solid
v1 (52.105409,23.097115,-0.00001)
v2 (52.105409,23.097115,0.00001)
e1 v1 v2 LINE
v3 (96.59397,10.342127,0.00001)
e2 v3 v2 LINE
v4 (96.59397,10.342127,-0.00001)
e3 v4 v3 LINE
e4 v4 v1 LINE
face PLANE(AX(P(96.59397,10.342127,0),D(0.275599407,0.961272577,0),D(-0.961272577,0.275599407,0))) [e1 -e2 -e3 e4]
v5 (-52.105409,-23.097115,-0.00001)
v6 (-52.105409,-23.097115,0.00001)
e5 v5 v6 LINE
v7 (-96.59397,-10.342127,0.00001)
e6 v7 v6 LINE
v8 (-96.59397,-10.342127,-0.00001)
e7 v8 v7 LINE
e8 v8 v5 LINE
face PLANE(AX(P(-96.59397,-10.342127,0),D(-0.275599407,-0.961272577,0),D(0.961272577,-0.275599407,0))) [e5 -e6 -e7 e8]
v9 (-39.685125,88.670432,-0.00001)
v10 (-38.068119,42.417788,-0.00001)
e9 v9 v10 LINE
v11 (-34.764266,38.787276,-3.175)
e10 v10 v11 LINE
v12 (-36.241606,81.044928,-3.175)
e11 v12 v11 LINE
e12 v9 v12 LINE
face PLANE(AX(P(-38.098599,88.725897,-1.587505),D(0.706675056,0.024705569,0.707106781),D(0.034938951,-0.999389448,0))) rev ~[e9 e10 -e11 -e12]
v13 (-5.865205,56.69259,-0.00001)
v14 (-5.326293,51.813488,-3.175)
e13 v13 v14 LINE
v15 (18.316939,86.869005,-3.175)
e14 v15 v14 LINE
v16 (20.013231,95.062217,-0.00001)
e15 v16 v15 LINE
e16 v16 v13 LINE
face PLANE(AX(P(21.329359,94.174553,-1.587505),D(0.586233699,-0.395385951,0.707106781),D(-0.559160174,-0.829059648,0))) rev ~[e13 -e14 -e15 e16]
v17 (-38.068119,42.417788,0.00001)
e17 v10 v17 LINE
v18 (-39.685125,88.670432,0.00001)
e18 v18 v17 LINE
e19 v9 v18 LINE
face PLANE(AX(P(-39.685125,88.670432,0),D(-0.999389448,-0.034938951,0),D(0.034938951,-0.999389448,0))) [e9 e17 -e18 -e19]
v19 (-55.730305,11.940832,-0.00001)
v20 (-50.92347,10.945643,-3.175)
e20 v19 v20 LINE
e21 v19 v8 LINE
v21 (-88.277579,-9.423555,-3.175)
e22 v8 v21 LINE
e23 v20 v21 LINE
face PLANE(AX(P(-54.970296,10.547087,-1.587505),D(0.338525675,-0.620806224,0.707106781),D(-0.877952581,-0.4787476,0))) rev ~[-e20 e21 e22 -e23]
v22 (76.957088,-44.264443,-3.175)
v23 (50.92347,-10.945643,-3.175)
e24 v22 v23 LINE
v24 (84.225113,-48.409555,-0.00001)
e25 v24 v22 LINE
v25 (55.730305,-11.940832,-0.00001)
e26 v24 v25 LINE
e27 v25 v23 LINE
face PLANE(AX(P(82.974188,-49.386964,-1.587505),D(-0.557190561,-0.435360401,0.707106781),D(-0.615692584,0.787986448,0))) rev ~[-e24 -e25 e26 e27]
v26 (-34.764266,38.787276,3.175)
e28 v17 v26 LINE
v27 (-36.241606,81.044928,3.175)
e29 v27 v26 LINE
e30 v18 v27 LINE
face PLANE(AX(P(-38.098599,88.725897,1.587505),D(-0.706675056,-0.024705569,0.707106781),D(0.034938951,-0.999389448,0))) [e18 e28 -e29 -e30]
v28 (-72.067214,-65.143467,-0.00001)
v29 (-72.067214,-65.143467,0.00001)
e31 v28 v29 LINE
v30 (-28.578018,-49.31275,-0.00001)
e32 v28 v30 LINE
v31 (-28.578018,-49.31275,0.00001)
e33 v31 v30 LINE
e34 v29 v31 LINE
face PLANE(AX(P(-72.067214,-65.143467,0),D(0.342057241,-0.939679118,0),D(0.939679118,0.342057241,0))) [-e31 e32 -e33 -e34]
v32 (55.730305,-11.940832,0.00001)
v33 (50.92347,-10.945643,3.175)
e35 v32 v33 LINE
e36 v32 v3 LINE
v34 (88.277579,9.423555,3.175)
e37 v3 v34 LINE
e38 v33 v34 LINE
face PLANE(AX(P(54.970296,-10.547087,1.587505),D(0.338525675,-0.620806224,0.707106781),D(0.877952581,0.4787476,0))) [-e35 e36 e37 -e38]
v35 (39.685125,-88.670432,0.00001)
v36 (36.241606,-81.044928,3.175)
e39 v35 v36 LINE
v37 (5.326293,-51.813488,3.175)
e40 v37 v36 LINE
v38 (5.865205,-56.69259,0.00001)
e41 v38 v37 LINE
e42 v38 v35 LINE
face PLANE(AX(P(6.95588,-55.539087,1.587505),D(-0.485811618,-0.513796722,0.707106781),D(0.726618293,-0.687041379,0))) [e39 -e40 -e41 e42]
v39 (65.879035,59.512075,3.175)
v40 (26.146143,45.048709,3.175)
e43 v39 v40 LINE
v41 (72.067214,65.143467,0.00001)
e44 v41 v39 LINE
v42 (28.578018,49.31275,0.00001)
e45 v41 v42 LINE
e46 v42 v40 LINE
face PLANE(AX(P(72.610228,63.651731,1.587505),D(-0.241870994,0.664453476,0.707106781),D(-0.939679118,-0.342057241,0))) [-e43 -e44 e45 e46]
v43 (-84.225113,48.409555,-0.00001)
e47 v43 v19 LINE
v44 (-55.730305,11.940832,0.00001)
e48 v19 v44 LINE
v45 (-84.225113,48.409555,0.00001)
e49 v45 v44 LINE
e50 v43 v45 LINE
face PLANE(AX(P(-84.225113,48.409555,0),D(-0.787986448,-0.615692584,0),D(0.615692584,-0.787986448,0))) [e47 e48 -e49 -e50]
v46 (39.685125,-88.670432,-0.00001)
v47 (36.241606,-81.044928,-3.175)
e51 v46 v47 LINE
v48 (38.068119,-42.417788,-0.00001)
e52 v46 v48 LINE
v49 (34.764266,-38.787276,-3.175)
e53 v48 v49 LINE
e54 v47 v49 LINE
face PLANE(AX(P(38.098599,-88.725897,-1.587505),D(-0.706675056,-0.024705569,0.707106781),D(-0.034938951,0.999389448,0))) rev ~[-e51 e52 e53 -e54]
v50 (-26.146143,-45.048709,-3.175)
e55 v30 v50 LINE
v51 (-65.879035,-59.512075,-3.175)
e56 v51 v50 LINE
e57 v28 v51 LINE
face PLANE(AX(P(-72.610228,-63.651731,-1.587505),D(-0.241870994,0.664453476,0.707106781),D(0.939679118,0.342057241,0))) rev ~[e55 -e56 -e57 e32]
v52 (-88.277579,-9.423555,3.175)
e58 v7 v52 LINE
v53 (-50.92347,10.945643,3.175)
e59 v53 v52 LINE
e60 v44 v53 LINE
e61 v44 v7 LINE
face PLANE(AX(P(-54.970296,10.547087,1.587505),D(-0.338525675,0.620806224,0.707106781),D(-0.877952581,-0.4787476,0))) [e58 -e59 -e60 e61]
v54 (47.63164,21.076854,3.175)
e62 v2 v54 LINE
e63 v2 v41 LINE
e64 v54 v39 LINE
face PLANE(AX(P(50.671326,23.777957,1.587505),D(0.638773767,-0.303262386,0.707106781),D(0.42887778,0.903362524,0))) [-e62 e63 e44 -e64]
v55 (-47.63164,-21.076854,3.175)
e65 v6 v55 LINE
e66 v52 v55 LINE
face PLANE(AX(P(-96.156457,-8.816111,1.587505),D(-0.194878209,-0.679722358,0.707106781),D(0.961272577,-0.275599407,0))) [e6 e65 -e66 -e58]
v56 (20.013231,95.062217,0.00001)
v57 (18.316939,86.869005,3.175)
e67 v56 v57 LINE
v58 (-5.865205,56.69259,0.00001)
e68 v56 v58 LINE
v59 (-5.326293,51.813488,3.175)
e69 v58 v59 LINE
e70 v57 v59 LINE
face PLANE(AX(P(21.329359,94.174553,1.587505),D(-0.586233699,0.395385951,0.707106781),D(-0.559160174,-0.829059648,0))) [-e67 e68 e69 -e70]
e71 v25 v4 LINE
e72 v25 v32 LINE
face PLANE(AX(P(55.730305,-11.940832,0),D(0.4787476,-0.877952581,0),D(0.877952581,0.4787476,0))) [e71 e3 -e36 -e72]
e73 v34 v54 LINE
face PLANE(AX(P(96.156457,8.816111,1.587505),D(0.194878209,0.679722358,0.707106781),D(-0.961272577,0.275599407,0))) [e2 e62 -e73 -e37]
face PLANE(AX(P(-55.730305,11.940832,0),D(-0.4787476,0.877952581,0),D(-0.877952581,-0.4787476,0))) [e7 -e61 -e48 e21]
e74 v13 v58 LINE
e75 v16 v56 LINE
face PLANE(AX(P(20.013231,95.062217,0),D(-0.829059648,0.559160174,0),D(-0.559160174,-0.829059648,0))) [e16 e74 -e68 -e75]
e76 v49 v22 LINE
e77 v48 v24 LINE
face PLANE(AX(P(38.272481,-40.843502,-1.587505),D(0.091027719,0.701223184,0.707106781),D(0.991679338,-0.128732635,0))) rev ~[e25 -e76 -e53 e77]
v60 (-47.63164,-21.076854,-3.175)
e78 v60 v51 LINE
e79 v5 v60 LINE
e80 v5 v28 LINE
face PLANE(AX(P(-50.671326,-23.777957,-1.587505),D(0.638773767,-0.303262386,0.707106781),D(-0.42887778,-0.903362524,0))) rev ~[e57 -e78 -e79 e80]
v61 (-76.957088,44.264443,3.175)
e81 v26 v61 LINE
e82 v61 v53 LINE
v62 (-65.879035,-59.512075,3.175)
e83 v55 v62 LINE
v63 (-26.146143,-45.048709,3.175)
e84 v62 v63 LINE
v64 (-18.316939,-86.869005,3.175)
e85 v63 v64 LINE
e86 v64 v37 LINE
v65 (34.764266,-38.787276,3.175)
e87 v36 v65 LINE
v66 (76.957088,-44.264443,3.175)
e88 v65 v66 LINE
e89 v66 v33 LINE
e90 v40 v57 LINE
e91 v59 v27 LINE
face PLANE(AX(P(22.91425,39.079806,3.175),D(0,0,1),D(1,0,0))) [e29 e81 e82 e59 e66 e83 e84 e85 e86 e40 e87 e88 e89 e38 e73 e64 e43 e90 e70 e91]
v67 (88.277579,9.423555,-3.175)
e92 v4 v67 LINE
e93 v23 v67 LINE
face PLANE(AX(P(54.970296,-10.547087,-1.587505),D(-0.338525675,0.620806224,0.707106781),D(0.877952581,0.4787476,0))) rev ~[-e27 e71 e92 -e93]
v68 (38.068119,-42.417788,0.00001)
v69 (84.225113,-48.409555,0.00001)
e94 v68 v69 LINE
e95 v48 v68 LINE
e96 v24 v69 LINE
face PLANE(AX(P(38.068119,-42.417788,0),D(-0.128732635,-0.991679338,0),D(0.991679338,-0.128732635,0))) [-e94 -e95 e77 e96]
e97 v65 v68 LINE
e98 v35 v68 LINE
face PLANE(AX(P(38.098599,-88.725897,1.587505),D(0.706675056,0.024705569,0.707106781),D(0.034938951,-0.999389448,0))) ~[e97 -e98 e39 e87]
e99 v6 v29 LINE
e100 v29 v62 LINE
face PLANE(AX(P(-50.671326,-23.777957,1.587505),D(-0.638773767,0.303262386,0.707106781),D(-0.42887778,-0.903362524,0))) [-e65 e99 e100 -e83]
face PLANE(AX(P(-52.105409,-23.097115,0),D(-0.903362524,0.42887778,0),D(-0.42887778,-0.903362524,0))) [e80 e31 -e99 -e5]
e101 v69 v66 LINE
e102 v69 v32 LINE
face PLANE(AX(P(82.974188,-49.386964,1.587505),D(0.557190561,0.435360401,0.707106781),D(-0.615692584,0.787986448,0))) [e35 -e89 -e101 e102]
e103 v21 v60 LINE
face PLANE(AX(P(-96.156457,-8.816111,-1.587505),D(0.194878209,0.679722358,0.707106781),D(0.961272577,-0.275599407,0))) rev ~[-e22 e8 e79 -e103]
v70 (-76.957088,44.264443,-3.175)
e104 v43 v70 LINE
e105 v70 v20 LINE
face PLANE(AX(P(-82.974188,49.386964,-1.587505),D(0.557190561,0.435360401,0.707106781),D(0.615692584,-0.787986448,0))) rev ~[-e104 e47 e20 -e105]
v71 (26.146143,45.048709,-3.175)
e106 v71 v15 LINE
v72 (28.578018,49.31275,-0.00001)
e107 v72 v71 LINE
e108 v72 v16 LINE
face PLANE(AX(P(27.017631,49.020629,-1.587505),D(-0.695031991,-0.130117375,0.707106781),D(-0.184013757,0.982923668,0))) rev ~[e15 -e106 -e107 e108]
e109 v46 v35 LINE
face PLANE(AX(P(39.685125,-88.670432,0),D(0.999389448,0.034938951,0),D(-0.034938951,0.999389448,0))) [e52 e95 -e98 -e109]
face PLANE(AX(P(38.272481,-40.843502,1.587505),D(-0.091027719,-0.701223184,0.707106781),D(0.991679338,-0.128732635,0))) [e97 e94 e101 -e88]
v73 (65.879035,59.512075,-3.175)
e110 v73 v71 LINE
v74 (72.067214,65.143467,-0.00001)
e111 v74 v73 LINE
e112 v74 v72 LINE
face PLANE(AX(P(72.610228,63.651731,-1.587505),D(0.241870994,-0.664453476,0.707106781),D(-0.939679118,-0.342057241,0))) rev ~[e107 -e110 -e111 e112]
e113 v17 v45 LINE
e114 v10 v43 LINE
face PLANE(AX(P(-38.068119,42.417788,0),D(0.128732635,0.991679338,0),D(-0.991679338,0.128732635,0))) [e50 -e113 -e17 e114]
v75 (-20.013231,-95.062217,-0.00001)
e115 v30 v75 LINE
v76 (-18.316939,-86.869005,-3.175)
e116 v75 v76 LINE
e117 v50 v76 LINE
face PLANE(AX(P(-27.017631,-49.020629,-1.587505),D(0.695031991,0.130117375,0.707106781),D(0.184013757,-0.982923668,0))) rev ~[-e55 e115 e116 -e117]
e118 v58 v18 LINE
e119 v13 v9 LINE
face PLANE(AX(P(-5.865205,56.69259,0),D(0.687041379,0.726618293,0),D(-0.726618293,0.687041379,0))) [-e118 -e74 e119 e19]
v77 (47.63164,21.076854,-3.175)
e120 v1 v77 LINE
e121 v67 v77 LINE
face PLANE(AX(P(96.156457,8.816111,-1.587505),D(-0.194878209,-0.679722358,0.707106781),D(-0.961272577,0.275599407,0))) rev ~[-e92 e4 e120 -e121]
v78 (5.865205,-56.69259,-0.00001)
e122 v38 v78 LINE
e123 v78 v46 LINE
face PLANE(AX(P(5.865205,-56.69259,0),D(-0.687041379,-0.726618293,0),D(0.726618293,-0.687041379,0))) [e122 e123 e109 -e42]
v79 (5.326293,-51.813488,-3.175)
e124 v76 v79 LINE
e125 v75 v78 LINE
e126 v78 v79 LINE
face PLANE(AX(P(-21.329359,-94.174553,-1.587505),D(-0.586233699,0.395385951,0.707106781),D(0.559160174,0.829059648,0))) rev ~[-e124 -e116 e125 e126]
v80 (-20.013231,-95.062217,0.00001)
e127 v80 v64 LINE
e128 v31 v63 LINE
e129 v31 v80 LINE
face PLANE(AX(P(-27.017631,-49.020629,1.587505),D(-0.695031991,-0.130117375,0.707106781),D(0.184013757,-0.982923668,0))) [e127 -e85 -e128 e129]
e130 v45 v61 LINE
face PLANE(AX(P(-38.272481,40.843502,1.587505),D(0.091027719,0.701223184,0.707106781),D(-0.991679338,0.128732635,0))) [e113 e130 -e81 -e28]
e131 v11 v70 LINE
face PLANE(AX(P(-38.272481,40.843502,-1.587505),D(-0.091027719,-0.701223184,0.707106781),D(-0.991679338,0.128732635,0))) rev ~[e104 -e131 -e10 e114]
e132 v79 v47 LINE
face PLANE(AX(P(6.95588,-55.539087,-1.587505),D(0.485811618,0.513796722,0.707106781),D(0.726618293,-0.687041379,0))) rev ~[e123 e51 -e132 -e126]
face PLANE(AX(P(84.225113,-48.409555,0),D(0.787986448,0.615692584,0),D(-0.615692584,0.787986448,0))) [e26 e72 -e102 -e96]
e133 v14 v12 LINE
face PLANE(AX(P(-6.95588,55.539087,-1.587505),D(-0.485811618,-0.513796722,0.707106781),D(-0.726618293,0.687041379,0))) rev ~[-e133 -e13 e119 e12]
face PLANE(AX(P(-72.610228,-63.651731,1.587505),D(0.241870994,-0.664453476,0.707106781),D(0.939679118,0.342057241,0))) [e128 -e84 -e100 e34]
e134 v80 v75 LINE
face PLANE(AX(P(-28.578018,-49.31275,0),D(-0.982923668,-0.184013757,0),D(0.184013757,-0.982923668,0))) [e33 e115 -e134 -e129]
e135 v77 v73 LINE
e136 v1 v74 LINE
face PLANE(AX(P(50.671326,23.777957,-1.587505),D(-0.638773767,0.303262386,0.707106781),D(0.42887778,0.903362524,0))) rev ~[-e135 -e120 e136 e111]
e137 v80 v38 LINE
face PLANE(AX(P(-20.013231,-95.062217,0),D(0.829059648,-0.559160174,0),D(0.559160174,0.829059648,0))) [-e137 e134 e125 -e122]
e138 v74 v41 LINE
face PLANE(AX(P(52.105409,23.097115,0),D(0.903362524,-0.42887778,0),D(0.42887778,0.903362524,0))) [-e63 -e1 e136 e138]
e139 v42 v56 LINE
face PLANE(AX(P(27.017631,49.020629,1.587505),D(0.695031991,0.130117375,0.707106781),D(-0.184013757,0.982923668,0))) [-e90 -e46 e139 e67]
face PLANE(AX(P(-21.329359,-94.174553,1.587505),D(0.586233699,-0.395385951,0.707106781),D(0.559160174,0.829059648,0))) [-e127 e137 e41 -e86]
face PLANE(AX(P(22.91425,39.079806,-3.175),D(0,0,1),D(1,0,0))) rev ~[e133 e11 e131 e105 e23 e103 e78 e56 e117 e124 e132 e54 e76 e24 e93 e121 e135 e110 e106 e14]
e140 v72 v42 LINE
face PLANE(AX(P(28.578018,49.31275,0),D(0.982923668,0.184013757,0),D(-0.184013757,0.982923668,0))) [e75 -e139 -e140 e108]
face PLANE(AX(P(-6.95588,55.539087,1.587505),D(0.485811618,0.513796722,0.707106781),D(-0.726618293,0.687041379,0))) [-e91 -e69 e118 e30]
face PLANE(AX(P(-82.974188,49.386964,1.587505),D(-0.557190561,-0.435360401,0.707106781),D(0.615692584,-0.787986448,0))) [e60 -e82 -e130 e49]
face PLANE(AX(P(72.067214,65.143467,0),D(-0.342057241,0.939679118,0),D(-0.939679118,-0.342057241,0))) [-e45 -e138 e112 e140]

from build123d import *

# Parameters (mm, degrees)
F1_DEPTH = 3.175
F2_SIZE  = 3.17499


# Not quite as in the source:
# - a fillet or chamfer is up to 0.001 mm smaller than in the source, because OpenCascade refuses the exact size


with BuildPart() as f1:
    # F0 (on Top) → F1 (new body, symmetric)
    with BuildSketch(Plane.XY):
        with BuildLine():
            Line((28.5780178367, 49.3127499276), (9.3443886308, 42.3114214845))
            Line((9.3443886308, 42.3114214845), (19.4354125913, 32.7700280349))
            ThreePointArc((19.4354125913, 32.7700280349), (19.9071953157, 32.4855902619), (20.374816102, 32.1943608231))
            Line((20.374816102, 32.1943608231), (32.4297987565, 28.7381652083))
            Line((32.4297987565, 28.7381652083), (28.5780178367, 49.3127499276))
        make_face()
        Polygon((17.3102603478, -39.723152866), (5.865205062, -56.692590155), (39.6851250968, -88.6704315269), (38.068118978, -42.4177878534), align=None)
        with BuildLine():
            Line((55.7303053322, -11.9408323194), (43.1281280055, 4.1879065968))
            Line((43.1281280055, 4.1879065968), (37.1720214851, -8.3576802229))
            ThreePointArc((37.1720214851, -8.3576802229), (37.0472939672, -8.8942683629), (36.9148210816, -9.4289970047))
            Line((36.9148210816, -9.4289970047), (37.3529782276, -21.961989993))
            Line((37.3529782276, -21.961989993), (55.7303053322, -11.9408323194))
        make_face()
        Polygon((-39.6851250968, 88.6704315269), (-38.068118978, 42.4177878534), (-17.3102603478, 39.723152866), (-5.865205062, 56.692590155), align=None)
        with BuildLine():
            Line((52.1054092529, 23.0971153067), (32.4297987565, 28.7381652083))
            Line((32.4297987565, 28.7381652083), (34.9853182751, 15.087660693))
            ThreePointArc((34.9853182751, 15.087660693), (35.1998101887, 14.5802387731), (35.4069429826, 14.069768606))
            Line((35.4069429826, 14.069768606), (43.1281280055, 4.1879065968))
            Line((43.1281280055, 4.1879065968), (52.1054092529, 23.0971153067))
        make_face()
        Polygon((37.3529782276, -21.961989993), (38.068118978, -42.4177878534), (84.2251125931, -48.4095547365), (55.7303053322, -11.9408323194), align=None)
        with BuildLine():
            ThreePointArc((25.1602759184, -28.6106713607), (24.7439706414, -28.9714672894), (24.322492216, -29.3262062395))
            Line((24.322492216, -29.3262062395), (17.3102603478, -39.723152866))
            Line((17.3102603478, -39.723152866), (38.068118978, -42.4177878534))
            Line((38.068118978, -42.4177878534), (37.3529782276, -21.961989993))
            Line((37.3529782276, -21.961989993), (25.1602759184, -28.6106713607))
        make_face()
        Polygon((-55.7303053322, 11.9408323194), (-37.3529782276, 21.961989993), (-38.068118978, 42.4177878534), (-84.2251125931, 48.4095547365), align=None)
        Polygon((96.5939697852, 10.342126583), (52.1054092529, 23.0971153067), (43.1281280055, 4.1879065968), (55.7303053322, -11.9408323194), align=None)
        with BuildLine():
            ThreePointArc((3.5381601171, -37.9353584797), (2.9892915472, -37.9825504152), (2.4397980151, -38.0218014519))
            Line((2.4397980151, -38.0218014519), (-9.3443886308, -42.3114214845))
            Line((-9.3443886308, -42.3114214845), (5.865205062, -56.692590155))
            Line((5.865205062, -56.692590155), (17.3102603478, -39.723152866))
            Line((17.3102603478, -39.723152866), (3.5381601171, -37.9353584797))
        make_face()
        Polygon((20.0132313387, 95.0622172711), (-5.865205062, 56.692590155), (9.3443886308, 42.3114214845), (28.5780178367, 49.3127499276), align=None)
        with BuildLine():
            Line((-38.068118978, 42.4177878534), (-37.3529782276, 21.961989993))
            Line((-37.3529782276, 21.961989993), (-25.1602759184, 28.6106713607))
            ThreePointArc((-25.1602759184, 28.6106713607), (-24.7439706414, 28.9714672894), (-24.322492216, 29.3262062395))
            Line((-24.322492216, 29.3262062395), (-17.3102603478, 39.723152866))
            Line((-17.3102603478, 39.723152866), (-38.068118978, 42.4177878534))
        make_face()
        Polygon((72.0672136275, 65.1434670637), (28.5780178367, 49.3127499276), (32.4297987565, 28.7381652083), (52.1054092529, 23.0971153067), align=None)
        with BuildLine():
            ThreePointArc((-19.4354125913, -32.7700280349), (-19.9071953157, -32.4855902619), (-20.374816102, -32.1943608231))
            Line((-20.374816102, -32.1943608231), (-32.4297987565, -28.7381652083))
            Line((-32.4297987565, -28.7381652083), (-28.5780178367, -49.3127499276))
            Line((-28.5780178367, -49.3127499276), (-9.3443886308, -42.3114214845))
            Line((-9.3443886308, -42.3114214845), (-19.4354125913, -32.7700280349))
        make_face()
        Polygon((-52.1054092529, -23.0971153067), (-43.1281280055, -4.1879065968), (-55.7303053322, 11.9408323194), (-96.5939697852, -10.342126583), align=None)
        with BuildLine():
            ThreePointArc((-34.9853182751, -15.087660693), (-35.1998101887, -14.5802387731), (-35.4069429826, -14.069768606))
            Line((-35.4069429826, -14.069768606), (-43.1281280055, -4.1879065968))
            Line((-43.1281280055, -4.1879065968), (-52.1054092529, -23.0971153067))
            Line((-52.1054092529, -23.0971153067), (-32.4297987565, -28.7381652083))
            Line((-32.4297987565, -28.7381652083), (-34.9853182751, -15.087660693))
        make_face()
        Polygon((-32.4297987565, -28.7381652083), (-52.1054092529, -23.0971153067), (-72.0672136275, -65.1434670637), (-28.5780178367, -49.3127499276), align=None)
        with BuildLine():
            ThreePointArc((-37.1720214851, 8.3576802229), (-37.0472939672, 8.8942683629), (-36.9148210816, 9.4289970047))
            Line((-36.9148210816, 9.4289970047), (-37.3529782276, 21.961989993))
            Line((-37.3529782276, 21.961989993), (-55.7303053322, 11.9408323194))
            Line((-55.7303053322, 11.9408323194), (-43.1281280055, -4.1879065968))
            Line((-43.1281280055, -4.1879065968), (-37.1720214851, 8.3576802229))
        make_face()
        Polygon((-9.3443886308, -42.3114214845), (-28.5780178367, -49.3127499276), (-20.0132313387, -95.0622172711), (5.865205062, -56.692590155), align=None)
        with BuildLine():
            Line((-5.865205062, 56.692590155), (-17.3102603478, 39.723152866))
            Line((-17.3102603478, 39.723152866), (-3.5381601171, 37.9353584797))
            ThreePointArc((-3.5381601171, 37.9353584797), (-2.9892915472, 37.9825504152), (-2.4397980151, 38.0218014519))
            Line((-2.4397980151, 38.0218014519), (9.3443886308, 42.3114214845))
            Line((9.3443886308, 42.3114214845), (-5.865205062, 56.692590155))
        make_face()
        with BuildLine():
            ThreePointArc((-25.1602759184, 28.6106713607), (-32.4855902619, 19.9071953157), (-36.9148210816, 9.4289970047))
            ThreePointArc((-36.9148210816, 9.4289970047), (-37.0472939672, 8.8942683629), (-37.1720214851, 8.3576802229))
            ThreePointArc((-37.1720214851, 8.3576802229), (-37.9825504152, -2.9892915472), (-35.4069429826, -14.069768606))
            ThreePointArc((-35.4069429826, -14.069768606), (-35.1998101887, -14.5802387731), (-34.9853182751, -15.087660693))
            ThreePointArc((-34.9853182751, -15.087660693), (-28.9714672894, -24.7439706414), (-20.374816102, -32.1943608231))
            ThreePointArc((-20.374816102, -32.1943608231), (-19.9071953157, -32.4855902619), (-19.4354125913, -32.7700280349))
            ThreePointArc((-19.4354125913, -32.7700280349), (-8.8942683629, -37.0472939672), (2.4397980151, -38.0218014519))
            ThreePointArc((2.4397980151, -38.0218014519), (2.9892915472, -37.9825504152), (3.5381601171, -37.9353584797))
            ThreePointArc((3.5381601171, -37.9353584797), (14.5802387731, -35.1998101887), (24.322492216, -29.3262062395))
            ThreePointArc((24.322492216, -29.3262062395), (24.7439706414, -28.9714672894), (25.1602759184, -28.6106713607))
            ThreePointArc((25.1602759184, -28.6106713607), (32.4855902619, -19.9071953157), (36.9148210816, -9.4289970047))
            ThreePointArc((36.9148210816, -9.4289970047), (37.0472939672, -8.8942683629), (37.1720214851, -8.3576802229))
            ThreePointArc((37.1720214851, -8.3576802229), (37.9825504152, 2.9892915472), (35.4069429826, 14.069768606))
            ThreePointArc((35.4069429826, 14.069768606), (35.1998101887, 14.5802387731), (34.9853182751, 15.087660693))
            ThreePointArc((34.9853182751, 15.087660693), (28.9714672894, 24.7439706414), (20.374816102, 32.1943608231))
            ThreePointArc((20.374816102, 32.1943608231), (19.9071953157, 32.4855902619), (19.4354125913, 32.7700280349))
            ThreePointArc((19.4354125913, 32.7700280349), (8.8942683629, 37.0472939672), (-2.4397980151, 38.0218014519))
            ThreePointArc((-2.4397980151, 38.0218014519), (-2.9892915472, 37.9825504152), (-3.5381601171, 37.9353584797))
            ThreePointArc((-3.5381601171, 37.9353584797), (-14.5802387731, 35.1998101887), (-24.322492216, 29.3262062395))
            ThreePointArc((-24.322492216, 29.3262062395), (-24.7439706414, 28.9714672894), (-25.1602759184, 28.6106713607))
        make_face()
        with BuildLine():
            ThreePointArc((-20.374816102, -32.1943608231), (-28.9714672894, -24.7439706414), (-34.9853182751, -15.087660693))
            Line((-34.9853182751, -15.087660693), (-32.4297987565, -28.7381652083))
            Line((-32.4297987565, -28.7381652083), (-20.374816102, -32.1943608231))
        make_face()
        with BuildLine():
            ThreePointArc((2.4397980151, -38.0218014519), (-8.8942683629, -37.0472939672), (-19.4354125913, -32.7700280349))
            Line((-19.4354125913, -32.7700280349), (-9.3443886308, -42.3114214845))
            Line((-9.3443886308, -42.3114214845), (2.4397980151, -38.0218014519))
        make_face()
        with BuildLine():
            ThreePointArc((24.322492216, -29.3262062395), (14.5802387731, -35.1998101887), (3.5381601171, -37.9353584797))
            Line((3.5381601171, -37.9353584797), (17.3102603478, -39.723152866))
            Line((17.3102603478, -39.723152866), (24.322492216, -29.3262062395))
        make_face()
        with BuildLine():
            ThreePointArc((36.9148210816, -9.4289970047), (32.4855902619, -19.9071953157), (25.1602759184, -28.6106713607))
            Line((25.1602759184, -28.6106713607), (37.3529782276, -21.961989993))
            Line((37.3529782276, -21.961989993), (36.9148210816, -9.4289970047))
        make_face()
        with BuildLine():
            Line((43.1281280055, 4.1879065968), (35.4069429826, 14.069768606))
            ThreePointArc((35.4069429826, 14.069768606), (37.9825504152, 2.9892915472), (37.1720214851, -8.3576802229))
            Line((37.1720214851, -8.3576802229), (43.1281280055, 4.1879065968))
        make_face()
        with BuildLine():
            Line((32.4297987565, 28.7381652083), (20.374816102, 32.1943608231))
            ThreePointArc((20.374816102, 32.1943608231), (28.9714672894, 24.7439706414), (34.9853182751, 15.087660693))
            Line((34.9853182751, 15.087660693), (32.4297987565, 28.7381652083))
        make_face()
        with BuildLine():
            Line((9.3443886308, 42.3114214845), (-2.4397980151, 38.0218014519))
            ThreePointArc((-2.4397980151, 38.0218014519), (8.8942683629, 37.0472939672), (19.4354125913, 32.7700280349))
            Line((19.4354125913, 32.7700280349), (9.3443886308, 42.3114214845))
        make_face()
        with BuildLine():
            Line((-17.3102603478, 39.723152866), (-24.322492216, 29.3262062395))
            ThreePointArc((-24.322492216, 29.3262062395), (-14.5802387731, 35.1998101887), (-3.5381601171, 37.9353584797))
            Line((-3.5381601171, 37.9353584797), (-17.3102603478, 39.723152866))
        make_face()
        with BuildLine():
            ThreePointArc((-35.4069429826, -14.069768606), (-37.9825504152, -2.9892915472), (-37.1720214851, 8.3576802229))
            Line((-37.1720214851, 8.3576802229), (-43.1281280055, -4.1879065968))
            Line((-43.1281280055, -4.1879065968), (-35.4069429826, -14.069768606))
        make_face()
        with BuildLine():
            Line((-37.3529782276, 21.961989993), (-36.9148210816, 9.4289970047))
            ThreePointArc((-36.9148210816, 9.4289970047), (-32.4855902619, 19.9071953157), (-25.1602759184, 28.6106713607))
            Line((-25.1602759184, 28.6106713607), (-37.3529782276, 21.961989993))
        make_face()
    extrude(amount=F1_DEPTH, both=True)

    # F2 (size 3.175 in the source; OpenCascade refuses exactly that, so slightly less here)
    f2_edges = [f1.edges().sort_by_distance(p)[0] for p in [
        (22.775165, -72.681511, 3.175),
        (38.876622, -65.54411, 3.175),
        (61.146616, -45.413671, 3.175),
        (69.977709, -30.175194, 3.175),
        (76.162138, -0.799353, 3.175),
        (74.34969, 16.719621, 3.175),
        (62.086311, 44.120291, 3.175),
        (50.322616, 57.228108, 3.175),
        (24.295625, 72.187484, 3.175),
        (7.074013, 75.877404, 3.175),
        (-22.775165, 72.681511, 3.175),
        (-38.876622, 65.54411, 3.175),
        (-61.146616, 45.413671, 3.175),
        (-69.977709, 30.175194, 3.175),
        (-76.162138, 0.799353, 3.175),
        (-74.34969, -16.719621, 3.175),
        (-62.086311, -44.120291, 3.175),
        (-50.322616, -57.228108, 3.175),
        (-24.295625, -72.187484, 3.175),
        (-7.074013, -75.877404, 3.175),
        (22.775165, -72.681511, -3.175),
        (38.876622, -65.54411, -3.175),
        (61.146616, -45.413671, -3.175),
        (69.977709, -30.175194, -3.175),
        (76.162138, -0.799353, -3.175),
        (74.34969, 16.719621, -3.175),
        (62.086311, 44.120291, -3.175),
        (50.322616, 57.228108, -3.175),
        (24.295625, 72.187484, -3.175),
        (7.074013, 75.877404, -3.175),
        (-22.775165, 72.681511, -3.175),
        (-38.876622, 65.54411, -3.175),
        (-61.146616, 45.413671, -3.175),
        (-69.977709, 30.175194, -3.175),
        (-76.162138, 0.799353, -3.175),
        (-74.34969, -16.719621, -3.175),
        (-62.086311, -44.120291, -3.175),
        (-50.322616, -57.228108, -3.175),
        (-24.295625, -72.187484, -3.175),
        (-7.074013, -75.877404, -3.175),
    ]]
    chamfer(f2_edges, length=F2_SIZE)


solid = f1.part
